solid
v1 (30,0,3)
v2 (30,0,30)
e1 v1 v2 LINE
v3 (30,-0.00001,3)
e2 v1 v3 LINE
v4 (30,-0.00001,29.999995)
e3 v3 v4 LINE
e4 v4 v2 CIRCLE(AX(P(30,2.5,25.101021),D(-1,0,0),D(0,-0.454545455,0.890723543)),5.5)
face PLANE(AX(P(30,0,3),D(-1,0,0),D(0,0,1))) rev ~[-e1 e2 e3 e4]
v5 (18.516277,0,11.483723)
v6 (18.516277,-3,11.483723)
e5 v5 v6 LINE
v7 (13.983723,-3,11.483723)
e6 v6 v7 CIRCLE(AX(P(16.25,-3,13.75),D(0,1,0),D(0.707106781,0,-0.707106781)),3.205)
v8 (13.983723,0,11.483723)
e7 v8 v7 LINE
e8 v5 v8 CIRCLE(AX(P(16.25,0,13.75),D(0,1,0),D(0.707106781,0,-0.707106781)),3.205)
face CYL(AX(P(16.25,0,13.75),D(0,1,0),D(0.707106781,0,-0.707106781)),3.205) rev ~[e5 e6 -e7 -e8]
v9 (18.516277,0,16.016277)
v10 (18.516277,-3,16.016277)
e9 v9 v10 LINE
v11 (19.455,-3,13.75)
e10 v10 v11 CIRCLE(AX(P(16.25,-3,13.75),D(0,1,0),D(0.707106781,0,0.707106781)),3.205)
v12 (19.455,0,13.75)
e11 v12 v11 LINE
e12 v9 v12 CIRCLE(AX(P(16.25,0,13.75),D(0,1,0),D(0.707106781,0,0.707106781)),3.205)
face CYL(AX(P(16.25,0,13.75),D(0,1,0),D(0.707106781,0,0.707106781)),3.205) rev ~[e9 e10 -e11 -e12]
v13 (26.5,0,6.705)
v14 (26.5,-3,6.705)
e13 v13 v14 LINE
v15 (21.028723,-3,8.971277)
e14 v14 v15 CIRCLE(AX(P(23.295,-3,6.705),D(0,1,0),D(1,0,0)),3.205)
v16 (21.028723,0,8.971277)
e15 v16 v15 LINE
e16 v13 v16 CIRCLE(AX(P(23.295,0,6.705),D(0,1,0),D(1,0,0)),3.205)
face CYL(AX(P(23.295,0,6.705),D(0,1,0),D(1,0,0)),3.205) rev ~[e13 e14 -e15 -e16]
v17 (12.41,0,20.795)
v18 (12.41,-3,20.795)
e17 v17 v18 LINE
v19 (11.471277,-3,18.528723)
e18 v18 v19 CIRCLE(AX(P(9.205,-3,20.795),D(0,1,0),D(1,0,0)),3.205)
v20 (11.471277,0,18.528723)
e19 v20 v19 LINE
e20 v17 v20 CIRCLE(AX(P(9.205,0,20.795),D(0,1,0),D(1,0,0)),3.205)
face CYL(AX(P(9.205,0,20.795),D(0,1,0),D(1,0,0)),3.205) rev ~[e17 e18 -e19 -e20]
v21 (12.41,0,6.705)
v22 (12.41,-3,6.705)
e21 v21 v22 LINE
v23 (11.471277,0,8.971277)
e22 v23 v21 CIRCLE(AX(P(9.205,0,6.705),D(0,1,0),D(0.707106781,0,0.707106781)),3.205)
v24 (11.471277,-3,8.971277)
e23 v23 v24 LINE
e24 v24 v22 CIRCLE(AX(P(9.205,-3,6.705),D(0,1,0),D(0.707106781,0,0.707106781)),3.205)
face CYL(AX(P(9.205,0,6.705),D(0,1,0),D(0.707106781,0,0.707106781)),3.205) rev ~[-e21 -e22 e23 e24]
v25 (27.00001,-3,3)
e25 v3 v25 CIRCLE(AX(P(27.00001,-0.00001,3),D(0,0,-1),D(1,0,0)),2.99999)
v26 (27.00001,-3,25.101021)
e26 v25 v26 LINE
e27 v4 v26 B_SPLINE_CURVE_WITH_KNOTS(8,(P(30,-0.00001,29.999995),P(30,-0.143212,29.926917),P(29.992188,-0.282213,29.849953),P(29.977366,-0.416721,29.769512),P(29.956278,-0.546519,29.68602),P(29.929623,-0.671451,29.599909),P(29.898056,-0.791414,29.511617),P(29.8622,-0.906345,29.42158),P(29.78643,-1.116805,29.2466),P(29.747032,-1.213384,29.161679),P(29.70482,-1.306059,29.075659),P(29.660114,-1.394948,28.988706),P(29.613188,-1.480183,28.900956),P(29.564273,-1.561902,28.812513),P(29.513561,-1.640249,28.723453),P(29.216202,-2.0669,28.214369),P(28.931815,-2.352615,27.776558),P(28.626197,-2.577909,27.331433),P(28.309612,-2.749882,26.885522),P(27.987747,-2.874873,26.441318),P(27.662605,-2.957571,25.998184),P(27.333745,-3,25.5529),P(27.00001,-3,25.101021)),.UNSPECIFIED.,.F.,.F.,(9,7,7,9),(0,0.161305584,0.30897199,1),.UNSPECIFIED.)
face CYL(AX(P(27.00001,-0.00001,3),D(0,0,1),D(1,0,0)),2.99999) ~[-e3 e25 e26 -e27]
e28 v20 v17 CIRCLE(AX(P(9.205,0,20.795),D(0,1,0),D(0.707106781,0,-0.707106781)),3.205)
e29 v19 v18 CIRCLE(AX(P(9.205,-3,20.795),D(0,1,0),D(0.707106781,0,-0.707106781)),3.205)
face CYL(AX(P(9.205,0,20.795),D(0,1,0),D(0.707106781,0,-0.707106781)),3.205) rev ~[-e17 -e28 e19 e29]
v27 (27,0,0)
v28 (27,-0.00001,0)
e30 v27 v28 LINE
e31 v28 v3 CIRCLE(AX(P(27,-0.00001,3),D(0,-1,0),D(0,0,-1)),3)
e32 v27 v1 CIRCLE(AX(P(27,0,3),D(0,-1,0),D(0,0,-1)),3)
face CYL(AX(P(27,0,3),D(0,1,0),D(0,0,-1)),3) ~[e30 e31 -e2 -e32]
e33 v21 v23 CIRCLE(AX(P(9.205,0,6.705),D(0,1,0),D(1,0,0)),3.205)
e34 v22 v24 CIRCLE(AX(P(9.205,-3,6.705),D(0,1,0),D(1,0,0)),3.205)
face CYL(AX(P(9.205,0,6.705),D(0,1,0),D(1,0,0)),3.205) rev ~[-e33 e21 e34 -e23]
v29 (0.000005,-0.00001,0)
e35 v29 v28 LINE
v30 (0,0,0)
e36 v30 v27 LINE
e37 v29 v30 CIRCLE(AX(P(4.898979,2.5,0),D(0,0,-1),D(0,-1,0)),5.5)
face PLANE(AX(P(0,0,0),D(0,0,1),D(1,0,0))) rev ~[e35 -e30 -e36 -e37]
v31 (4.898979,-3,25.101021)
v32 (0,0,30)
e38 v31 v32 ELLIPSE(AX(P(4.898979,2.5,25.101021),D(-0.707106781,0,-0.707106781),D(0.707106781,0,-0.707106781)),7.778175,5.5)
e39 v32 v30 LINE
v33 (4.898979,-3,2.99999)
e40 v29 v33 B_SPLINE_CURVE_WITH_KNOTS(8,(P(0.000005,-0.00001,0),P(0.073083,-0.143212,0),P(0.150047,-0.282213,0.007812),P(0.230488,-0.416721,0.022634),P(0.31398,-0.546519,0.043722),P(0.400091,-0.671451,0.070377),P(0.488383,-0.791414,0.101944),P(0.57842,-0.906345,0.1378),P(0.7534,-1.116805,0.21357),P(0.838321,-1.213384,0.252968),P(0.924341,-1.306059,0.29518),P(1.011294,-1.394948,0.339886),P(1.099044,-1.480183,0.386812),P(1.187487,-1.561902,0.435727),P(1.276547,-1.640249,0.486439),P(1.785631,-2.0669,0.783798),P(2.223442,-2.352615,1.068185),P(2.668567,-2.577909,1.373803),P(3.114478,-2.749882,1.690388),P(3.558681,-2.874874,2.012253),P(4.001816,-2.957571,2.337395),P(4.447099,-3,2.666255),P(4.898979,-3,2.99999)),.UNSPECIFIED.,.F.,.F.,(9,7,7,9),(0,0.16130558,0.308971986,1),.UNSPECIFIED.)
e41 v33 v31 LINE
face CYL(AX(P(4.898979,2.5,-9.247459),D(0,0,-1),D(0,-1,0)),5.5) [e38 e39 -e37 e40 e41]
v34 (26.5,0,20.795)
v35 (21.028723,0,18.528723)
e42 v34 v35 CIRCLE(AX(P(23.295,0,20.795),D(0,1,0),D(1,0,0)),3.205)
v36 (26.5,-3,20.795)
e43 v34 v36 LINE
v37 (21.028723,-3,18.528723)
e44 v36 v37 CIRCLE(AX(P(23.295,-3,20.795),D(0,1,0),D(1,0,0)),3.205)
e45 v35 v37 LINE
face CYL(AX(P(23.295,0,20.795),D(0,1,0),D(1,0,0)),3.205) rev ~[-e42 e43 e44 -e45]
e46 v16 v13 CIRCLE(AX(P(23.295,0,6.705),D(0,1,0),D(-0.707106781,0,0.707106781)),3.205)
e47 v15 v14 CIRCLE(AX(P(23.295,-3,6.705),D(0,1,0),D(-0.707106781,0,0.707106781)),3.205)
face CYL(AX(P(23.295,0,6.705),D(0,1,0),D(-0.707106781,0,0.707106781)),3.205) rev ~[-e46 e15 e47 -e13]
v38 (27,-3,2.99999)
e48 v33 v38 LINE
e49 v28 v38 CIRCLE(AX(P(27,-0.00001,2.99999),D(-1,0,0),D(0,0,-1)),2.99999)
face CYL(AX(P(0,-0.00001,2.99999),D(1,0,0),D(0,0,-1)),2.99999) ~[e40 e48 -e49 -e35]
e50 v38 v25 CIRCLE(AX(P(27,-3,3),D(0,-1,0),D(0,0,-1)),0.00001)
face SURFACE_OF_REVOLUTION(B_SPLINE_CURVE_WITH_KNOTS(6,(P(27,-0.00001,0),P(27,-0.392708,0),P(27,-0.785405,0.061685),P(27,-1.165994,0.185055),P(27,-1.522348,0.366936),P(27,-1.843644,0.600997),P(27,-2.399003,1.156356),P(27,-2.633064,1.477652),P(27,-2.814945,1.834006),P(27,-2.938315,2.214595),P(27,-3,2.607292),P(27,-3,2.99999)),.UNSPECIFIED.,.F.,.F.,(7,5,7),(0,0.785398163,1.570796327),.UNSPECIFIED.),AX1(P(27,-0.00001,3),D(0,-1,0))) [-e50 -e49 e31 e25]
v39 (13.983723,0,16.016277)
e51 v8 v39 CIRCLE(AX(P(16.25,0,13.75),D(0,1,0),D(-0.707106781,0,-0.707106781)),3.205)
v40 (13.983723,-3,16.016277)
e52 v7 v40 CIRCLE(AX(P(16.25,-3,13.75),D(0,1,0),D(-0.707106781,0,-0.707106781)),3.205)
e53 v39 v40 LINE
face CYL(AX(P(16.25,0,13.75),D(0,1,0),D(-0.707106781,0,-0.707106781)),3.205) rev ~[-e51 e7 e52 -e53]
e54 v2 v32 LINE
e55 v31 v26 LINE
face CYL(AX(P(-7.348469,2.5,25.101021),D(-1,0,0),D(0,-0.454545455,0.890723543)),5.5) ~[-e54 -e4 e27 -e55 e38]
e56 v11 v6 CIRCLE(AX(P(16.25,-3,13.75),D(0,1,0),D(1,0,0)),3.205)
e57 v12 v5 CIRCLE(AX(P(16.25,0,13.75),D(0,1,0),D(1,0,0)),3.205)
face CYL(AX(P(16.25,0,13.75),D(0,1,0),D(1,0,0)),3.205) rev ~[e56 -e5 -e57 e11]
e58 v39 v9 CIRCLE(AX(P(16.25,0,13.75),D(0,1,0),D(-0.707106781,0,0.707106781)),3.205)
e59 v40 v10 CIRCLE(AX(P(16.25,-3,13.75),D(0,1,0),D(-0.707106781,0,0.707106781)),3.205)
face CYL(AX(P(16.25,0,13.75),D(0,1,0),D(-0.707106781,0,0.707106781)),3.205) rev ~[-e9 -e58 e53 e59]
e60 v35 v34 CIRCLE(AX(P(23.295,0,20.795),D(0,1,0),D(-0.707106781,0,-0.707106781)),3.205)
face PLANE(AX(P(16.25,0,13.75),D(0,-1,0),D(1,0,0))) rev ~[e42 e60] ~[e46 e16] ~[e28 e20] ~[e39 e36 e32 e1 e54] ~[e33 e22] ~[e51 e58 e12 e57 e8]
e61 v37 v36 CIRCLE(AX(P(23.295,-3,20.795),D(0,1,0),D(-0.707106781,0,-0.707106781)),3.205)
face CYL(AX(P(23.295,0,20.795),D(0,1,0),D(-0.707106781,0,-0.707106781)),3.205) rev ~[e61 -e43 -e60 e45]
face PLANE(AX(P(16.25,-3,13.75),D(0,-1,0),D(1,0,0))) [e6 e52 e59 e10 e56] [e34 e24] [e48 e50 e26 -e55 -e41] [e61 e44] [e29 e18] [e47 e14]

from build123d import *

# Parameters (mm, degrees)
F0_W        = 21.5
F0_H        = 21.5
F0_W_2      = 5.5
F0_H_2      = 5.5
F0_W_3      = 3
F0_H_3      = 3
F1_DEPTH    = 3
F2_R        = 2.99999
F3_T1_DEPTH = 51.4949074278
F4_T1_DEPTH = 46.5959279422


# Not quite as in the source:
# - a fillet or chamfer that OpenCascade refuses, or shapes differently, is made with other operations: its cross-section is extruded or revolved along the edge and cut away or added
# - a fillet or chamfer is up to 0.001 mm smaller than in the source, because OpenCascade refuses the exact size


with BuildPart() as f1:
    # F0 (on Front) → F1 (new body)
    with BuildSketch(Plane.XZ):
        with Locations((16.25, 13.75)):
            Rectangle(F0_W, F0_H)
        with BuildLine():
            ThreePointArc((11.4712772337, 8.9712772337), (12.1660339017, 7.9315004007), (12.41, 6.705))
            ThreePointArc((12.41, 6.705), (6.2439660983, 5.4784995993), (11.4712772337, 8.9712772337))
        make_face(mode=Mode.SUBTRACT)
        with BuildLine():
            ThreePointArc((26.5, 6.705), (22.0684995993, 3.7439660983), (21.0287227663, 8.9712772337))
            ThreePointArc((21.0287227663, 8.9712772337), (24.5215004007, 9.6660339017), (26.5, 6.705))
        make_face(mode=Mode.SUBTRACT)
        with BuildLine():
            ThreePointArc((18.5162772337, 11.4837227663), (16.25, 10.545), (13.9837227663, 11.4837227663))
            ThreePointArc((13.9837227663, 11.4837227663), (13.045, 13.75), (13.9837227663, 16.0162772337))
            ThreePointArc((13.9837227663, 16.0162772337), (16.25, 16.955), (18.5162772337, 16.0162772337))
            ThreePointArc((18.5162772337, 16.0162772337), (19.2110339017, 14.9765004007), (19.455, 13.75))
            ThreePointArc((19.455, 13.75), (19.2110339017, 12.5234995993), (18.5162772337, 11.4837227663))
        make_face(mode=Mode.SUBTRACT)
        with BuildLine():
            ThreePointArc((12.41, 20.795), (12.1660339017, 19.5684995993), (11.4712772337, 18.5287227663))
            ThreePointArc((11.4712772337, 18.5287227663), (6.2439660983, 22.0215004007), (12.41, 20.795))
        make_face(mode=Mode.SUBTRACT)
        with BuildLine():
            ThreePointArc((26.5, 20.795), (24.5215004007, 17.8339660983), (21.0287227663, 18.5287227663))
            ThreePointArc((21.0287227663, 18.5287227663), (22.0684995993, 23.7560339017), (26.5, 20.795))
        make_face(mode=Mode.SUBTRACT)
        with Locations((2.75, 13.75)):
            Rectangle(F0_W_2, F0_H)
        with Locations((2.75, 27.25)):
            Rectangle(F0_W_2, F0_H_2)
        with Locations((16.25, 27.25)):
            Rectangle(F0_W, F0_H_2)
        with Locations((28.5, 27.25)):
            Rectangle(F0_W_3, F0_H_2)
        with Locations((28.5, 13.75)):
            Rectangle(F0_W_3, F0_H)
        with BuildLine():
            Line((27, 3), (27, 0))
            ThreePointArc((27, 0), (29.1213203436, 0.8786796564), (30, 3))
            Line((30, 3), (27, 3))
        make_face()
        with Locations((16.25, 1.5)):
            Rectangle(F0_W, F0_H_3)
        with Locations((2.75, 1.5)):
            Rectangle(F0_W_2, F0_H_3)
    extrude(amount=F1_DEPTH)

    # F2 (radius 3 in the source; OpenCascade refuses exactly that, so slightly less here)
    f2_edges = [f1.edges().sort_by_distance(p)[0] for p in [
        (29.12132, -3, 0.87868),
        (13.5, -3, 0),
        (30, -3, 16.5),
    ]]
    fillet(f2_edges, radius=F2_R)

    # F3: fillet of radius 5.5 on 1 edges, made by hand

    # F3_s2 → F3_t1 (cut)
    with BuildSketch(Plane.XY.offset(-9.2474587139)):
        with BuildLine():
            ThreePointArc((4.8989794856, -3), (2.0266981623, -2.1904157598), (0, 0))
            Line((0, 0), (0, -3))
            Line((0, -3), (4.8989794856, -3))
        make_face()
    extrude(amount=F3_T1_DEPTH, mode=Mode.SUBTRACT)

    # F4: fillet of radius 5.5 on 1 edges, made by hand

    # F4_s2 → F4_t1 (cut)
    with BuildSketch(Plane.YZ.offset(-7.3484692283)):
        with BuildLine():
            ThreePointArc((0, 30), (-2.1904157598, 27.9733018377), (-3, 25.1010205144))
            Line((-3, 25.1010205144), (-3, 30))
            Line((-3, 30), (0, 30))
        make_face()
    extrude(amount=F4_T1_DEPTH, mode=Mode.SUBTRACT)


solid = f1.part
